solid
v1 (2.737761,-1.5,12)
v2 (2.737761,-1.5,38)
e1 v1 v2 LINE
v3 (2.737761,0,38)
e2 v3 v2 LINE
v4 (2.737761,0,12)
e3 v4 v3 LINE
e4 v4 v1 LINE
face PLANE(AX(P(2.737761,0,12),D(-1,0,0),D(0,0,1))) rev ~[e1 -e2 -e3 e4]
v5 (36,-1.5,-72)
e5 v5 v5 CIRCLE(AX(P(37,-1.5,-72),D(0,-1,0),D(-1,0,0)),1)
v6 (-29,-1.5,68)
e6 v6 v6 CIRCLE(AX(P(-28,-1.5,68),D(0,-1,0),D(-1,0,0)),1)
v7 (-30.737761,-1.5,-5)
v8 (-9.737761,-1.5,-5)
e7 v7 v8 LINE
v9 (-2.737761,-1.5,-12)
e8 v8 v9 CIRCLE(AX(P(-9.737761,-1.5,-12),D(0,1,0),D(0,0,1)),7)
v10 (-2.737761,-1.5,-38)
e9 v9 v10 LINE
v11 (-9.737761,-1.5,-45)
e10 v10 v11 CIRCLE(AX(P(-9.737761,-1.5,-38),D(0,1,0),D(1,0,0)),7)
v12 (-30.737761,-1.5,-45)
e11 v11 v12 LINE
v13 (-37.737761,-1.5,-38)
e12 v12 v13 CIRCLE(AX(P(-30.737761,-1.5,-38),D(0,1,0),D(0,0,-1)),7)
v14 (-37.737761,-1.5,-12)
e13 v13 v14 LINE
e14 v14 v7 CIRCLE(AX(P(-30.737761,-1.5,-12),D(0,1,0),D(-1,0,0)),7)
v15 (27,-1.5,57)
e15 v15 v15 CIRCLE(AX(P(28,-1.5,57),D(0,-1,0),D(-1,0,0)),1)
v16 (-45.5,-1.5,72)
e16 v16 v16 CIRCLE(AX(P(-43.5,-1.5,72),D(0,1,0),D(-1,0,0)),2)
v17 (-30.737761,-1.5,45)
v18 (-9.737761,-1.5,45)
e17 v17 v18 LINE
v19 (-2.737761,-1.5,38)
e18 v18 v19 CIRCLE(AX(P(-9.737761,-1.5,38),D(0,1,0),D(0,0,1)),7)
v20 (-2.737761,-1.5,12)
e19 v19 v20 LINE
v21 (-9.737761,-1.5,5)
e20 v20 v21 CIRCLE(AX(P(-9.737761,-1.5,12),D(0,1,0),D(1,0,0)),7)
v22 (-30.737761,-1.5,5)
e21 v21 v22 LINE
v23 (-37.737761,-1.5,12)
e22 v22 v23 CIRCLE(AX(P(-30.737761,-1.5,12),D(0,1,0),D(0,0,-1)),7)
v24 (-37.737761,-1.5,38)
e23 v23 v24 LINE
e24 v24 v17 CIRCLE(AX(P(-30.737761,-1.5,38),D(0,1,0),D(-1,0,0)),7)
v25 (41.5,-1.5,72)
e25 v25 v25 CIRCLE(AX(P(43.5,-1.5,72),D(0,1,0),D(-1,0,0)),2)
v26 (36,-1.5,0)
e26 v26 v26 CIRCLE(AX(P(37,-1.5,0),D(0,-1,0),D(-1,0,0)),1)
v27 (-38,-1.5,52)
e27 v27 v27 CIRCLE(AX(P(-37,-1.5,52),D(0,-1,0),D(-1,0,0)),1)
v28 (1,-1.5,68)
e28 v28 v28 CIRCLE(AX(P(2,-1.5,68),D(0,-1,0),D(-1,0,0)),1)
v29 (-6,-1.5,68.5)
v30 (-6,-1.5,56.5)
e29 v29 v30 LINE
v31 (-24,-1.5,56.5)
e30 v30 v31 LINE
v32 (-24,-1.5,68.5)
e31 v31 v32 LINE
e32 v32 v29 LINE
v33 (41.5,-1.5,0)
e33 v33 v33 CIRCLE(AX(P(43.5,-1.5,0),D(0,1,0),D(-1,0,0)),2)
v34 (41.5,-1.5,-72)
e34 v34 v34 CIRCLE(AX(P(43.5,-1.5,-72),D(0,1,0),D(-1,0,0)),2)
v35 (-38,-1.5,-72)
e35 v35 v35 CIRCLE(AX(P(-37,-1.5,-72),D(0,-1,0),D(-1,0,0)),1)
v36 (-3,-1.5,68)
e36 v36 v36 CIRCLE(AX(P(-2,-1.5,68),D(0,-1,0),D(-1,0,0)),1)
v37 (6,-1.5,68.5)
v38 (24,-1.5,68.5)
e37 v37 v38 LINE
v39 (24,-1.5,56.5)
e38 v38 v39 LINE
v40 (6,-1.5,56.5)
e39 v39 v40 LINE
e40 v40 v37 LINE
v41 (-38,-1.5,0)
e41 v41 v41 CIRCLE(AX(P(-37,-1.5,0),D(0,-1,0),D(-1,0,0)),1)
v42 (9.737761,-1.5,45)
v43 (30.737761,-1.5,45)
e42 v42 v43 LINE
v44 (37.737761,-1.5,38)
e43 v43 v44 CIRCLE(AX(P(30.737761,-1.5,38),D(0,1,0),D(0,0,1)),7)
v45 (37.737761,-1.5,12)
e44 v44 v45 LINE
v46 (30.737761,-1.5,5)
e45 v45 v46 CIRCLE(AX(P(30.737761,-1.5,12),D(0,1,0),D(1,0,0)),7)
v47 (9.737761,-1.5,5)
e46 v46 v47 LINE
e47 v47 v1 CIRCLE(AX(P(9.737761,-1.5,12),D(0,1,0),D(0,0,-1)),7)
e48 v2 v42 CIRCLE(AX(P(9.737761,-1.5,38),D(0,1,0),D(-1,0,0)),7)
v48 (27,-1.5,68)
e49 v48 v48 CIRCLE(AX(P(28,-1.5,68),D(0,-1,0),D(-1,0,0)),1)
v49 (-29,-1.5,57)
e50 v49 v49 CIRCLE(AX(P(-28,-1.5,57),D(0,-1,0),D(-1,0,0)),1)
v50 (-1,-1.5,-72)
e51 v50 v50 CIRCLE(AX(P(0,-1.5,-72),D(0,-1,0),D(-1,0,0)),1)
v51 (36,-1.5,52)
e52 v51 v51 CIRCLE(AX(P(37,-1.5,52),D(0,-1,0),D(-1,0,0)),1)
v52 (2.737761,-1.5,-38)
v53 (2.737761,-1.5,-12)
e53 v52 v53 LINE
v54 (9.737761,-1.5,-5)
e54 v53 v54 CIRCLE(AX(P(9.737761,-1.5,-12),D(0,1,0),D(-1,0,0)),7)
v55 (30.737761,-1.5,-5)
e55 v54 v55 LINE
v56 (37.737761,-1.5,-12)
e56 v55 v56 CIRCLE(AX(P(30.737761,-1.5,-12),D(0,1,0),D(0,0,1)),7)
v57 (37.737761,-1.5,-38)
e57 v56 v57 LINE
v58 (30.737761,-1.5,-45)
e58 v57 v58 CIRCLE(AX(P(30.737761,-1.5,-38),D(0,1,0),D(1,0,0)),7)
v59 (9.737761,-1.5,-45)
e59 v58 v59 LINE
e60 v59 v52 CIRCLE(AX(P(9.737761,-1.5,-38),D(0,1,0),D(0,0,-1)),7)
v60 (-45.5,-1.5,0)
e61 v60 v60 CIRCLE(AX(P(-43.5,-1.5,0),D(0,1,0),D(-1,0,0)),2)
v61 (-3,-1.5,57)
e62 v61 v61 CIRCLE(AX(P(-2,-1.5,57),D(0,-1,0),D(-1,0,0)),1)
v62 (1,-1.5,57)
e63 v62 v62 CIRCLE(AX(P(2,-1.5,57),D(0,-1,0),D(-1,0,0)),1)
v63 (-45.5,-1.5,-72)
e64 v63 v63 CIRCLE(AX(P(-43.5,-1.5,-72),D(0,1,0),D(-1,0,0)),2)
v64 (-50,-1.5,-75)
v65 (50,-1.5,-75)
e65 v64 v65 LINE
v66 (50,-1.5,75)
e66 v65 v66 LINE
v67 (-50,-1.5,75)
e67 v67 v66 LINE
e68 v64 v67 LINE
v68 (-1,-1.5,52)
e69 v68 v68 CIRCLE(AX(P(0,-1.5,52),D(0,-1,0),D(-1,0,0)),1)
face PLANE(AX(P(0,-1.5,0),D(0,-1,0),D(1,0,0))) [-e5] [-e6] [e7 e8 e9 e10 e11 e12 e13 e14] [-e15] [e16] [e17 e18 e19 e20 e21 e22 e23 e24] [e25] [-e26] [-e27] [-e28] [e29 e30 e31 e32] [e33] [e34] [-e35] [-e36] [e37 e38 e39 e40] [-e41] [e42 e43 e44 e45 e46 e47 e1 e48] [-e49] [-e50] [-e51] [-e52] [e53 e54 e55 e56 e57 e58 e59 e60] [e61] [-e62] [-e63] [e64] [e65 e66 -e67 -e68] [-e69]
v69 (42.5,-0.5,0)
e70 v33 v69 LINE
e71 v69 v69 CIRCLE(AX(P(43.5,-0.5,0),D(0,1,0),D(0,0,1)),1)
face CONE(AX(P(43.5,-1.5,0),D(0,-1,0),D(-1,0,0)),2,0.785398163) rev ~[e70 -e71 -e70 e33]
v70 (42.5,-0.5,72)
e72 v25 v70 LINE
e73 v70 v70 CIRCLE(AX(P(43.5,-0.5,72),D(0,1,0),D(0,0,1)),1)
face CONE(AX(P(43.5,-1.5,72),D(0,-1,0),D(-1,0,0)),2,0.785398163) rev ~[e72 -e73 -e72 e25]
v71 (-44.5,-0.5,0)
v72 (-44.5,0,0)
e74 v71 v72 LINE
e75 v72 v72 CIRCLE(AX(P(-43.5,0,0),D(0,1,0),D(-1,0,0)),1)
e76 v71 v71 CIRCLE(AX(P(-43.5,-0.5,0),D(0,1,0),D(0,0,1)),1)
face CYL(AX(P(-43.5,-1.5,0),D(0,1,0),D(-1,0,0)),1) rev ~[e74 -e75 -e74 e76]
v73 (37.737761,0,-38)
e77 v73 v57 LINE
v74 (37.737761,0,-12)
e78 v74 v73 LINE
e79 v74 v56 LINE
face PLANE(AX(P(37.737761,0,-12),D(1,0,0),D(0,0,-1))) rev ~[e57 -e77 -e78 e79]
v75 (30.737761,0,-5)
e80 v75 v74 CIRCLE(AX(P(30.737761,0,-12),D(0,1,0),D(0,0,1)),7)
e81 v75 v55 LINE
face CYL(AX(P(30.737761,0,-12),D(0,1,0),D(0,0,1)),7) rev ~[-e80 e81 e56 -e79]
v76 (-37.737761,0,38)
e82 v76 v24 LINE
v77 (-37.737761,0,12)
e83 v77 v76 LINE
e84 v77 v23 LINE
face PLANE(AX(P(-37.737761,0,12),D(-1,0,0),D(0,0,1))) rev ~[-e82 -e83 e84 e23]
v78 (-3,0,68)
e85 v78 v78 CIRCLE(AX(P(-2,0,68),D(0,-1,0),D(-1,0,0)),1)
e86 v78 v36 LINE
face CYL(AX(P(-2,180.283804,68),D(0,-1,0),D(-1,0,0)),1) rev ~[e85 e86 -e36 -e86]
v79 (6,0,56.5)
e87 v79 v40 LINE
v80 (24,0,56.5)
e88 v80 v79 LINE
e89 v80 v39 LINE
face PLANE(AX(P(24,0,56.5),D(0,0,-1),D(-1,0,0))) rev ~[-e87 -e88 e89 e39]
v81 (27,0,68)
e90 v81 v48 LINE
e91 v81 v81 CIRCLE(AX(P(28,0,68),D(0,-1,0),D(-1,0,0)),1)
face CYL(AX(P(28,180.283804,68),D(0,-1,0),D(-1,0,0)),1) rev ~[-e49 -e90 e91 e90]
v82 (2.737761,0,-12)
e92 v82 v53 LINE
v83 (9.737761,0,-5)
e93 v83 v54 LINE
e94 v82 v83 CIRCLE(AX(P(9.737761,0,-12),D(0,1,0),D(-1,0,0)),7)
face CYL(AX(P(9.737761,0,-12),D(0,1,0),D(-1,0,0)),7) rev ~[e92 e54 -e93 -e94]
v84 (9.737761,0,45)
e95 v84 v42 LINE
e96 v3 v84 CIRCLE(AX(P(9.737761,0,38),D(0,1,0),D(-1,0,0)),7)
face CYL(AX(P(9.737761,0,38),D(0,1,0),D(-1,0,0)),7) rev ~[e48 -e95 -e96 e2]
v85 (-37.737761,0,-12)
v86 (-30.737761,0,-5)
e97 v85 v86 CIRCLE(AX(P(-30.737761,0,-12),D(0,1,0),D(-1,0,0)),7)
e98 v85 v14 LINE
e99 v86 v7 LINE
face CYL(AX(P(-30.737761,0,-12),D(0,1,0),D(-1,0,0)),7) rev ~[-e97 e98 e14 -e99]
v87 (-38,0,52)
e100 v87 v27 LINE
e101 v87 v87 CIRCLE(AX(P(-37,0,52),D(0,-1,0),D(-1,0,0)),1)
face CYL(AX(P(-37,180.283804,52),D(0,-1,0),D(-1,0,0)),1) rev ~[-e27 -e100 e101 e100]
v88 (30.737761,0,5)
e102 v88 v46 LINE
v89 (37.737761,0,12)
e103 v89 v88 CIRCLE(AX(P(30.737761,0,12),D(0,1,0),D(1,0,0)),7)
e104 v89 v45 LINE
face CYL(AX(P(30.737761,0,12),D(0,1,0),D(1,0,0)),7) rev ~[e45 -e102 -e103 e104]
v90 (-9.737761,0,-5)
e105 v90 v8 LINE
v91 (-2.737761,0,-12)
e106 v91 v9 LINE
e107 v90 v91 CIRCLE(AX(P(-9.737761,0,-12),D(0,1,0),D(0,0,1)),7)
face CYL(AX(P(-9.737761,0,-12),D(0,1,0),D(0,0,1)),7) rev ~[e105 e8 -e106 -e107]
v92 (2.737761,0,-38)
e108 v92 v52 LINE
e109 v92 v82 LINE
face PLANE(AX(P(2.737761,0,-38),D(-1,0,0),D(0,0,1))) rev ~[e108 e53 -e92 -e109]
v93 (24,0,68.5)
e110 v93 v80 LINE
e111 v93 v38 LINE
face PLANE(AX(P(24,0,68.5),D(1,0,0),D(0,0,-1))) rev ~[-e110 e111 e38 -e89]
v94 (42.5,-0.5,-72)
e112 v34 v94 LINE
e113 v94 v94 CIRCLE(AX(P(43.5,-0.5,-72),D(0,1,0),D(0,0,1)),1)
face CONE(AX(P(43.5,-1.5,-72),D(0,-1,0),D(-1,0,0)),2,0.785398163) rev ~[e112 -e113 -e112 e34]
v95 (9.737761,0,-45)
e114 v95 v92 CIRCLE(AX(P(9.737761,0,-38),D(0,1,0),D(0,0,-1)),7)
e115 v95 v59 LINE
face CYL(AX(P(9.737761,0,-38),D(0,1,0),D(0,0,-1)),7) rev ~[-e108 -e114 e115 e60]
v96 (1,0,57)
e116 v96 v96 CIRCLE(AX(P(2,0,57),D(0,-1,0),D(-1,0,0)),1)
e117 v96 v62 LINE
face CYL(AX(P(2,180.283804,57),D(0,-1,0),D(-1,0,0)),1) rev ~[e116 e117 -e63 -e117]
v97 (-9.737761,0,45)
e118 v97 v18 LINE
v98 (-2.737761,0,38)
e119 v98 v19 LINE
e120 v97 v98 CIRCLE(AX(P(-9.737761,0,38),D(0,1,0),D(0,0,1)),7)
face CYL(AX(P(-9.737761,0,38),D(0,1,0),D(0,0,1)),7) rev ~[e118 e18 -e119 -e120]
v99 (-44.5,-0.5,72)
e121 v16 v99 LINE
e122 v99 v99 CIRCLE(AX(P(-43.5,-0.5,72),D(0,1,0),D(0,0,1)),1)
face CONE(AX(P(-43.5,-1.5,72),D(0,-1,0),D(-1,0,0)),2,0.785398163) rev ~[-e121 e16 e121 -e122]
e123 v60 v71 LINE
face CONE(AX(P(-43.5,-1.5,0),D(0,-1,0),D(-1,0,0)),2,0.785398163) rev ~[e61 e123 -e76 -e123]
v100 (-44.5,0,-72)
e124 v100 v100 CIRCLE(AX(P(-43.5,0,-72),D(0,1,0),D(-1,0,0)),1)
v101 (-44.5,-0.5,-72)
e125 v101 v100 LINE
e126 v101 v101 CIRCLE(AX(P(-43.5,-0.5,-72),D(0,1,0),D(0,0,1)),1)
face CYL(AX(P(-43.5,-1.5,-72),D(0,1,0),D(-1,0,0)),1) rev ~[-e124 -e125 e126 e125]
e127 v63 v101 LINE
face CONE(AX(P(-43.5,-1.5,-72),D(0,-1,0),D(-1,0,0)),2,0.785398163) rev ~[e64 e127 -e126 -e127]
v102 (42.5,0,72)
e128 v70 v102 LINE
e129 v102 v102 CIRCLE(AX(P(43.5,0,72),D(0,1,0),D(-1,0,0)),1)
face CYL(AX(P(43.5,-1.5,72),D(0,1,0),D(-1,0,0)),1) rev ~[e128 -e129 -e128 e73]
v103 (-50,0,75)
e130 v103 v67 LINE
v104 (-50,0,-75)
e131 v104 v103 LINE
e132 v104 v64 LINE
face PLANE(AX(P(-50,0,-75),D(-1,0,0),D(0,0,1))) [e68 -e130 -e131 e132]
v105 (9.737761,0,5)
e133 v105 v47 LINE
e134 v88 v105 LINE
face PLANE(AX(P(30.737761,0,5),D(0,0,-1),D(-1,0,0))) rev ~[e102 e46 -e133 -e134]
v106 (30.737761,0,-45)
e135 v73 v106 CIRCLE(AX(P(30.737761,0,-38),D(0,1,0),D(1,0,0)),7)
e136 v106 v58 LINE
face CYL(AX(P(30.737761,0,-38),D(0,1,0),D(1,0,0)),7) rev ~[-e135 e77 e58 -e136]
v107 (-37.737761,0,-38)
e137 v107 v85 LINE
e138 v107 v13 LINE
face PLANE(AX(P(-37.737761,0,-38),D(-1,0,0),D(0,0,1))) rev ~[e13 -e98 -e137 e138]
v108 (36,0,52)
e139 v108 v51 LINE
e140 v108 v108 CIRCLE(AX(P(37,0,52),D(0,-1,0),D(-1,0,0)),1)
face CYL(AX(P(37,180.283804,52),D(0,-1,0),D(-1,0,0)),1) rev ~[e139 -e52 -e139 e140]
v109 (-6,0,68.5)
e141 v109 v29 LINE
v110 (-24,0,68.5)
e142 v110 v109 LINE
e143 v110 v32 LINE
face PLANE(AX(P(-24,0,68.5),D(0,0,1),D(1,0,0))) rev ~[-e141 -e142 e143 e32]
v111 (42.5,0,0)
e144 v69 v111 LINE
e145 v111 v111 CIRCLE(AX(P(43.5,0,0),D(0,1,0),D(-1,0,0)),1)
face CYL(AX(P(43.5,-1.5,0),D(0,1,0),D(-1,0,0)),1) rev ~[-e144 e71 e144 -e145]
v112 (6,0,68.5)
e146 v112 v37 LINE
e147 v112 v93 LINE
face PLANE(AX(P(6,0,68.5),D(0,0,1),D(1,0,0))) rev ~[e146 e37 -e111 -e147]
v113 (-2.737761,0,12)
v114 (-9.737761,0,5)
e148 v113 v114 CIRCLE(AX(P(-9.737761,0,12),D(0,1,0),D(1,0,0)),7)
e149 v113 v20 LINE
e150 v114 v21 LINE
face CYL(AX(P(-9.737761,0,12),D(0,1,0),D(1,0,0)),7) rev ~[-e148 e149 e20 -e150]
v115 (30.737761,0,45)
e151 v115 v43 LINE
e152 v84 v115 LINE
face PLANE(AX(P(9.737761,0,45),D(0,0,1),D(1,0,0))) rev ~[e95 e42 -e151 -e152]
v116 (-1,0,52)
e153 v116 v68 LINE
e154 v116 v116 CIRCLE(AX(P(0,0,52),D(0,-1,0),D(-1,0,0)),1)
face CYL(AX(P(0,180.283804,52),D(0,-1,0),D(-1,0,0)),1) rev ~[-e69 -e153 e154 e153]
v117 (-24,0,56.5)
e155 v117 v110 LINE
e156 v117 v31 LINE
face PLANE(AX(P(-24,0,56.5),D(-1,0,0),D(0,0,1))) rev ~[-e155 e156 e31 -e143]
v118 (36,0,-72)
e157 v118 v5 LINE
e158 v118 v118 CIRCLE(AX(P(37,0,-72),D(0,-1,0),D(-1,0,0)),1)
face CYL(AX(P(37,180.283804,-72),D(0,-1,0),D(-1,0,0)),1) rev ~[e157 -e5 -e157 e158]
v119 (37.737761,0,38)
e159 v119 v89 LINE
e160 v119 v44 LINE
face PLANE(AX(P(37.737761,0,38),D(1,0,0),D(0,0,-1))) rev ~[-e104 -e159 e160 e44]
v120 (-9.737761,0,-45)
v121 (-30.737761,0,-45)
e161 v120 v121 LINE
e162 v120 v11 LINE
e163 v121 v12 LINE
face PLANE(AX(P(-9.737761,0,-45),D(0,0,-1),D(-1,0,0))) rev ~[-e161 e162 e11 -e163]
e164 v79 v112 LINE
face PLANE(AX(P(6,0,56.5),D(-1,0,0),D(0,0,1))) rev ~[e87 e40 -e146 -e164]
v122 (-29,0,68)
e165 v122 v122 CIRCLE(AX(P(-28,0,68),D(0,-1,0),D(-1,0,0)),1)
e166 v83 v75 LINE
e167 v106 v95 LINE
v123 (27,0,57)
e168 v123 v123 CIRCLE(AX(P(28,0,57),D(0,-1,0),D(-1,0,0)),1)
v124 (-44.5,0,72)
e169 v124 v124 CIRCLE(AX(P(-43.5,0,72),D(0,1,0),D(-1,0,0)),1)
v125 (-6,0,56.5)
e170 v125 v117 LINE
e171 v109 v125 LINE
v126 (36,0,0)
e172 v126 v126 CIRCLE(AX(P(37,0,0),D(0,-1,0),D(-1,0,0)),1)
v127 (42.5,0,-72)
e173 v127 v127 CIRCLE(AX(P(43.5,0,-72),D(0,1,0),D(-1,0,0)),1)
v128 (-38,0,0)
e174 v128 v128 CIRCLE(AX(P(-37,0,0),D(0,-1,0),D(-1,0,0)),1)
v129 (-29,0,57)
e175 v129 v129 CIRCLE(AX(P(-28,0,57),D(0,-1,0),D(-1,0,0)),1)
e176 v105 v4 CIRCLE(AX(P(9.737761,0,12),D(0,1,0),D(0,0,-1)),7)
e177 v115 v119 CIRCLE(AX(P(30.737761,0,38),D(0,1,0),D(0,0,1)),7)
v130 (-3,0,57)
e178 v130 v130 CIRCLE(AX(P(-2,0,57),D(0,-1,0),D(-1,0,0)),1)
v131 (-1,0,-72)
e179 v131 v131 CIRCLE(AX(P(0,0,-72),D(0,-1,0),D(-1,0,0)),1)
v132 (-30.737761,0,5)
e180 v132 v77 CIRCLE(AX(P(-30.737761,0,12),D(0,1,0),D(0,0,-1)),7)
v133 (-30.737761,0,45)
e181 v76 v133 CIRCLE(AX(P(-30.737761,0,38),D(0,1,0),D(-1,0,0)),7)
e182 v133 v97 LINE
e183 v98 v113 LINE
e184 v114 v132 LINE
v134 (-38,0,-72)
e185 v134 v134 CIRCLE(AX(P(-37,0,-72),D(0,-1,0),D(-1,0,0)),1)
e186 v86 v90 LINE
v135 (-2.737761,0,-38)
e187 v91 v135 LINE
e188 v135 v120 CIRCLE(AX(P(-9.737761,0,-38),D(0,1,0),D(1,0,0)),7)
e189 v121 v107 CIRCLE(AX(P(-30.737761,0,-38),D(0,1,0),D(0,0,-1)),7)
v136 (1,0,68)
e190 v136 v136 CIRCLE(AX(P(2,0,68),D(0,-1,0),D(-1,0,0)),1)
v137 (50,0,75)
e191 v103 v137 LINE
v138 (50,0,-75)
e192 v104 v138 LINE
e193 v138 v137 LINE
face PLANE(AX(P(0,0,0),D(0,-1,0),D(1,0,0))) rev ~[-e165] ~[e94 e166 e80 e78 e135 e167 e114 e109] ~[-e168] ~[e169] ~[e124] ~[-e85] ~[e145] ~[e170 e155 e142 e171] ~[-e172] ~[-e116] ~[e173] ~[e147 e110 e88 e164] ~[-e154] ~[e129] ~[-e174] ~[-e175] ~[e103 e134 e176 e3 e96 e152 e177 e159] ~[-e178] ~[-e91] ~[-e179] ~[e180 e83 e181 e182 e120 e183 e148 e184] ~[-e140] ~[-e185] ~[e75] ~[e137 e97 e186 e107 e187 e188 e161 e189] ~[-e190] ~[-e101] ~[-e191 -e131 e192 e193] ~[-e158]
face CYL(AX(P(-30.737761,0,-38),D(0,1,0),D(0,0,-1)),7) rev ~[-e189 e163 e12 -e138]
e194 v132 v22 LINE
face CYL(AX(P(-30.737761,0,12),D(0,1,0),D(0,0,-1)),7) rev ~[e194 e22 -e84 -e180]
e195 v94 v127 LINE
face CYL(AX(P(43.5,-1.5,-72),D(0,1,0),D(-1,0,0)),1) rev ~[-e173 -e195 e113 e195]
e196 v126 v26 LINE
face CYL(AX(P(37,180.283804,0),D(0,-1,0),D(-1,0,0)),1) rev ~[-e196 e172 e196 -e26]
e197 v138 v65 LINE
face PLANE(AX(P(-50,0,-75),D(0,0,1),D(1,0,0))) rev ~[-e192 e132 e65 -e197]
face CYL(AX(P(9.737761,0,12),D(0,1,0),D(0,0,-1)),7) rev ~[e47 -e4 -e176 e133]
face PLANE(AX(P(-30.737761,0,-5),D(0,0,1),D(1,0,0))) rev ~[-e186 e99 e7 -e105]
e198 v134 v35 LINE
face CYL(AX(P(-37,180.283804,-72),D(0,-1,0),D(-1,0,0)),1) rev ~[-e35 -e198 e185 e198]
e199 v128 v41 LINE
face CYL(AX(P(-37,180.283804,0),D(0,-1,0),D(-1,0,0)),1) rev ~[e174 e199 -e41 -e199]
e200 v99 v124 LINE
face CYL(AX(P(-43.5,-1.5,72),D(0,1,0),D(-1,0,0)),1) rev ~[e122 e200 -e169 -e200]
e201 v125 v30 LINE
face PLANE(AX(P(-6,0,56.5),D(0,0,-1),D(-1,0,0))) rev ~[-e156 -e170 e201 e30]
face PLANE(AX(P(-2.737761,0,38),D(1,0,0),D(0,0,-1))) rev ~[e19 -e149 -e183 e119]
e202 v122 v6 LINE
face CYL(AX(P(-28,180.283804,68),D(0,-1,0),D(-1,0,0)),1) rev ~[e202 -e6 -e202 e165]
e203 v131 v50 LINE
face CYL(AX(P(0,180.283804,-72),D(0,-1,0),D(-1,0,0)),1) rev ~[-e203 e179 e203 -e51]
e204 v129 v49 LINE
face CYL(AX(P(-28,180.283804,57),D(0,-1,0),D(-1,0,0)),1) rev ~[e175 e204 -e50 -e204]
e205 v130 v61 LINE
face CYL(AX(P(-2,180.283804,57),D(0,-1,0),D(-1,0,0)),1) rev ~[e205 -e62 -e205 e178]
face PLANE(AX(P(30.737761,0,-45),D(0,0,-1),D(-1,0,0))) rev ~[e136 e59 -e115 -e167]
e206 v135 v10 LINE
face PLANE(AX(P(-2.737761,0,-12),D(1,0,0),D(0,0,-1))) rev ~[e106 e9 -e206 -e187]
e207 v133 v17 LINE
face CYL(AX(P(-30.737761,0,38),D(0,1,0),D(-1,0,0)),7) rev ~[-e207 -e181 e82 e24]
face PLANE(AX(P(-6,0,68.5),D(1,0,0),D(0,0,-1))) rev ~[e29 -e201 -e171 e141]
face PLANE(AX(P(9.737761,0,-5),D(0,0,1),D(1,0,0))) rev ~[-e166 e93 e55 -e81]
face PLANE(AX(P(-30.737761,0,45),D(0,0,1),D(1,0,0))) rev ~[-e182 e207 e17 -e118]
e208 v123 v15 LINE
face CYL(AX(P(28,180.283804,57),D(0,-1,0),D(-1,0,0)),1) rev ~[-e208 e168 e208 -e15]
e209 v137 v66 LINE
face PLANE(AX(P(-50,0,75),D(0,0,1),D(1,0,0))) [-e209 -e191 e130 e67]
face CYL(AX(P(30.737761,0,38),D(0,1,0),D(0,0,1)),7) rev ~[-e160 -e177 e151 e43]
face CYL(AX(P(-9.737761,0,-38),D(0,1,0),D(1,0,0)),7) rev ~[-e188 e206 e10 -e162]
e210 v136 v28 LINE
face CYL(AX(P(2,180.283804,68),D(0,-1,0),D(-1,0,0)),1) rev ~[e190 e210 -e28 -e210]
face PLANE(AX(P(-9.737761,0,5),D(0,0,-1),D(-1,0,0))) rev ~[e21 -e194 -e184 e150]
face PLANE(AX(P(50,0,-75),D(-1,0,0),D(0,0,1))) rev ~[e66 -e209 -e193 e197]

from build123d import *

# Parameters (mm, degrees)
F0_W           = 100
F0_H           = 150
F1_DEPTH       = 1.5
F3_D           = 2
F3_CSINK_D     = 4
F3_CSINK_ANGLE = 90
F4_D           = 2
F6_D           = 2


# Not quite as in the source:
# - a feature names something its author has since deleted; it is built from what else it names


with BuildPart() as f1:
    # F0 (on Front) → F1 (new body)
    with BuildSketch(Plane.XZ):
        Rectangle(F0_W, F0_H)
        with BuildLine():
            Line((-30.7377611669, -5), (-9.7377611669, -5))
            ThreePointArc((-9.7377611669, -5), (-4.7880136986, -7.0502525317), (-2.7377611669, -12))
            Line((-2.7377611669, -12), (-2.7377611669, -38))
            ThreePointArc((-2.7377611669, -38), (-4.7880136986, -42.9497474683), (-9.7377611669, -45))
            Line((-9.7377611669, -45), (-30.7377611669, -45))
            ThreePointArc((-30.7377611669, -45), (-35.6875086352, -42.9497474683), (-37.7377611669, -38))
            Line((-37.7377611669, -38), (-37.7377611669, -12))
            ThreePointArc((-37.7377611669, -12), (-35.6875086352, -7.0502525317), (-30.7377611669, -5))
        make_face(mode=Mode.SUBTRACT)
        with BuildLine():
            ThreePointArc((37.7377611669, -38), (35.6875086352, -42.9497474683), (30.7377611669, -45))
            Line((30.7377611669, -45), (9.7377611669, -45))
            ThreePointArc((9.7377611669, -45), (4.7880136986, -42.9497474683), (2.7377611669, -38))
            Line((2.7377611669, -38), (2.7377611669, -12))
            ThreePointArc((2.7377611669, -12), (4.7880136986, -7.0502525317), (9.7377611669, -5))
            Line((9.7377611669, -5), (30.7377611669, -5))
            ThreePointArc((30.7377611669, -5), (35.6875086352, -7.0502525317), (37.7377611669, -12))
            Line((37.7377611669, -12), (37.7377611669, -38))
        make_face(mode=Mode.SUBTRACT)
        with BuildLine():
            ThreePointArc((-2.7377611669, 12), (-4.7880136986, 7.0502525317), (-9.7377611669, 5))
            Line((-9.7377611669, 5), (-30.7377611669, 5))
            ThreePointArc((-30.7377611669, 5), (-35.6875086352, 7.0502525317), (-37.7377611669, 12))
            Line((-37.7377611669, 12), (-37.7377611669, 38))
            ThreePointArc((-37.7377611669, 38), (-35.6875086352, 42.9497474683), (-30.7377611669, 45))
            Line((-30.7377611669, 45), (-9.7377611669, 45))
            ThreePointArc((-9.7377611669, 45), (-4.7880136986, 42.9497474683), (-2.7377611669, 38))
            Line((-2.7377611669, 38), (-2.7377611669, 12))
        make_face(mode=Mode.SUBTRACT)
        Polygon((-24, 56.5), (-24, 68.5), (-15, 68.5), (-6, 68.5), (-6, 56.5), (-15, 56.5), align=None, mode=Mode.SUBTRACT)
        with BuildLine():
            ThreePointArc((9.7377611669, 5), (4.7880136986, 7.0502525317), (2.7377611669, 12))
            Line((2.7377611669, 12), (2.7377611669, 38))
            ThreePointArc((2.7377611669, 38), (4.7880136986, 42.9497474683), (9.7377611669, 45))
            Line((9.7377611669, 45), (30.7377611669, 45))
            ThreePointArc((30.7377611669, 45), (35.6875086352, 42.9497474683), (37.7377611669, 38))
            Line((37.7377611669, 38), (37.7377611669, 12))
            ThreePointArc((37.7377611669, 12), (35.6875086352, 7.0502525317), (30.7377611669, 5))
            Line((30.7377611669, 5), (9.7377611669, 5))
        make_face(mode=Mode.SUBTRACT)
        Polygon((6, 56.5), (6, 68.5), (15, 68.5), (24, 68.5), (24, 56.5), (15, 56.5), align=None, mode=Mode.SUBTRACT)
    extrude(amount=F1_DEPTH)

    # F3 (through all)
    with Locations(Plane.XZ.offset(1.5)):
        with Locations((-43.5, -72), (43.5, -72), (43.5, 72), (-43.5, 72), (-43.5, 0), (43.5, 0)):
            CounterSinkHole(F3_D / 2, F3_CSINK_D / 2, counter_sink_angle=F3_CSINK_ANGLE)

    # F4 (through all)
    with Locations(Plane(origin=(0, 0, 0), x_dir=(1, 0, 0), z_dir=(0, 1, 0))):
        with Locations((-28, -68), (-28, -57), (-2, -57), (-2, -68), (2, -68), (2, -57), (28, -57), (28, -68)):
            Hole(F4_D / 2)

    # F6 (through all)
    with Locations(Plane(origin=(0, 0, 0), x_dir=(1, 0, 0), z_dir=(0, 1, 0))):
        with Locations((-37, 72), (0, 72), (37, 72), (0, -52), (-37, -52), (37, -52), (-37, 0), (37, 0)):
            Hole(F6_D / 2)


solid = f1.part
